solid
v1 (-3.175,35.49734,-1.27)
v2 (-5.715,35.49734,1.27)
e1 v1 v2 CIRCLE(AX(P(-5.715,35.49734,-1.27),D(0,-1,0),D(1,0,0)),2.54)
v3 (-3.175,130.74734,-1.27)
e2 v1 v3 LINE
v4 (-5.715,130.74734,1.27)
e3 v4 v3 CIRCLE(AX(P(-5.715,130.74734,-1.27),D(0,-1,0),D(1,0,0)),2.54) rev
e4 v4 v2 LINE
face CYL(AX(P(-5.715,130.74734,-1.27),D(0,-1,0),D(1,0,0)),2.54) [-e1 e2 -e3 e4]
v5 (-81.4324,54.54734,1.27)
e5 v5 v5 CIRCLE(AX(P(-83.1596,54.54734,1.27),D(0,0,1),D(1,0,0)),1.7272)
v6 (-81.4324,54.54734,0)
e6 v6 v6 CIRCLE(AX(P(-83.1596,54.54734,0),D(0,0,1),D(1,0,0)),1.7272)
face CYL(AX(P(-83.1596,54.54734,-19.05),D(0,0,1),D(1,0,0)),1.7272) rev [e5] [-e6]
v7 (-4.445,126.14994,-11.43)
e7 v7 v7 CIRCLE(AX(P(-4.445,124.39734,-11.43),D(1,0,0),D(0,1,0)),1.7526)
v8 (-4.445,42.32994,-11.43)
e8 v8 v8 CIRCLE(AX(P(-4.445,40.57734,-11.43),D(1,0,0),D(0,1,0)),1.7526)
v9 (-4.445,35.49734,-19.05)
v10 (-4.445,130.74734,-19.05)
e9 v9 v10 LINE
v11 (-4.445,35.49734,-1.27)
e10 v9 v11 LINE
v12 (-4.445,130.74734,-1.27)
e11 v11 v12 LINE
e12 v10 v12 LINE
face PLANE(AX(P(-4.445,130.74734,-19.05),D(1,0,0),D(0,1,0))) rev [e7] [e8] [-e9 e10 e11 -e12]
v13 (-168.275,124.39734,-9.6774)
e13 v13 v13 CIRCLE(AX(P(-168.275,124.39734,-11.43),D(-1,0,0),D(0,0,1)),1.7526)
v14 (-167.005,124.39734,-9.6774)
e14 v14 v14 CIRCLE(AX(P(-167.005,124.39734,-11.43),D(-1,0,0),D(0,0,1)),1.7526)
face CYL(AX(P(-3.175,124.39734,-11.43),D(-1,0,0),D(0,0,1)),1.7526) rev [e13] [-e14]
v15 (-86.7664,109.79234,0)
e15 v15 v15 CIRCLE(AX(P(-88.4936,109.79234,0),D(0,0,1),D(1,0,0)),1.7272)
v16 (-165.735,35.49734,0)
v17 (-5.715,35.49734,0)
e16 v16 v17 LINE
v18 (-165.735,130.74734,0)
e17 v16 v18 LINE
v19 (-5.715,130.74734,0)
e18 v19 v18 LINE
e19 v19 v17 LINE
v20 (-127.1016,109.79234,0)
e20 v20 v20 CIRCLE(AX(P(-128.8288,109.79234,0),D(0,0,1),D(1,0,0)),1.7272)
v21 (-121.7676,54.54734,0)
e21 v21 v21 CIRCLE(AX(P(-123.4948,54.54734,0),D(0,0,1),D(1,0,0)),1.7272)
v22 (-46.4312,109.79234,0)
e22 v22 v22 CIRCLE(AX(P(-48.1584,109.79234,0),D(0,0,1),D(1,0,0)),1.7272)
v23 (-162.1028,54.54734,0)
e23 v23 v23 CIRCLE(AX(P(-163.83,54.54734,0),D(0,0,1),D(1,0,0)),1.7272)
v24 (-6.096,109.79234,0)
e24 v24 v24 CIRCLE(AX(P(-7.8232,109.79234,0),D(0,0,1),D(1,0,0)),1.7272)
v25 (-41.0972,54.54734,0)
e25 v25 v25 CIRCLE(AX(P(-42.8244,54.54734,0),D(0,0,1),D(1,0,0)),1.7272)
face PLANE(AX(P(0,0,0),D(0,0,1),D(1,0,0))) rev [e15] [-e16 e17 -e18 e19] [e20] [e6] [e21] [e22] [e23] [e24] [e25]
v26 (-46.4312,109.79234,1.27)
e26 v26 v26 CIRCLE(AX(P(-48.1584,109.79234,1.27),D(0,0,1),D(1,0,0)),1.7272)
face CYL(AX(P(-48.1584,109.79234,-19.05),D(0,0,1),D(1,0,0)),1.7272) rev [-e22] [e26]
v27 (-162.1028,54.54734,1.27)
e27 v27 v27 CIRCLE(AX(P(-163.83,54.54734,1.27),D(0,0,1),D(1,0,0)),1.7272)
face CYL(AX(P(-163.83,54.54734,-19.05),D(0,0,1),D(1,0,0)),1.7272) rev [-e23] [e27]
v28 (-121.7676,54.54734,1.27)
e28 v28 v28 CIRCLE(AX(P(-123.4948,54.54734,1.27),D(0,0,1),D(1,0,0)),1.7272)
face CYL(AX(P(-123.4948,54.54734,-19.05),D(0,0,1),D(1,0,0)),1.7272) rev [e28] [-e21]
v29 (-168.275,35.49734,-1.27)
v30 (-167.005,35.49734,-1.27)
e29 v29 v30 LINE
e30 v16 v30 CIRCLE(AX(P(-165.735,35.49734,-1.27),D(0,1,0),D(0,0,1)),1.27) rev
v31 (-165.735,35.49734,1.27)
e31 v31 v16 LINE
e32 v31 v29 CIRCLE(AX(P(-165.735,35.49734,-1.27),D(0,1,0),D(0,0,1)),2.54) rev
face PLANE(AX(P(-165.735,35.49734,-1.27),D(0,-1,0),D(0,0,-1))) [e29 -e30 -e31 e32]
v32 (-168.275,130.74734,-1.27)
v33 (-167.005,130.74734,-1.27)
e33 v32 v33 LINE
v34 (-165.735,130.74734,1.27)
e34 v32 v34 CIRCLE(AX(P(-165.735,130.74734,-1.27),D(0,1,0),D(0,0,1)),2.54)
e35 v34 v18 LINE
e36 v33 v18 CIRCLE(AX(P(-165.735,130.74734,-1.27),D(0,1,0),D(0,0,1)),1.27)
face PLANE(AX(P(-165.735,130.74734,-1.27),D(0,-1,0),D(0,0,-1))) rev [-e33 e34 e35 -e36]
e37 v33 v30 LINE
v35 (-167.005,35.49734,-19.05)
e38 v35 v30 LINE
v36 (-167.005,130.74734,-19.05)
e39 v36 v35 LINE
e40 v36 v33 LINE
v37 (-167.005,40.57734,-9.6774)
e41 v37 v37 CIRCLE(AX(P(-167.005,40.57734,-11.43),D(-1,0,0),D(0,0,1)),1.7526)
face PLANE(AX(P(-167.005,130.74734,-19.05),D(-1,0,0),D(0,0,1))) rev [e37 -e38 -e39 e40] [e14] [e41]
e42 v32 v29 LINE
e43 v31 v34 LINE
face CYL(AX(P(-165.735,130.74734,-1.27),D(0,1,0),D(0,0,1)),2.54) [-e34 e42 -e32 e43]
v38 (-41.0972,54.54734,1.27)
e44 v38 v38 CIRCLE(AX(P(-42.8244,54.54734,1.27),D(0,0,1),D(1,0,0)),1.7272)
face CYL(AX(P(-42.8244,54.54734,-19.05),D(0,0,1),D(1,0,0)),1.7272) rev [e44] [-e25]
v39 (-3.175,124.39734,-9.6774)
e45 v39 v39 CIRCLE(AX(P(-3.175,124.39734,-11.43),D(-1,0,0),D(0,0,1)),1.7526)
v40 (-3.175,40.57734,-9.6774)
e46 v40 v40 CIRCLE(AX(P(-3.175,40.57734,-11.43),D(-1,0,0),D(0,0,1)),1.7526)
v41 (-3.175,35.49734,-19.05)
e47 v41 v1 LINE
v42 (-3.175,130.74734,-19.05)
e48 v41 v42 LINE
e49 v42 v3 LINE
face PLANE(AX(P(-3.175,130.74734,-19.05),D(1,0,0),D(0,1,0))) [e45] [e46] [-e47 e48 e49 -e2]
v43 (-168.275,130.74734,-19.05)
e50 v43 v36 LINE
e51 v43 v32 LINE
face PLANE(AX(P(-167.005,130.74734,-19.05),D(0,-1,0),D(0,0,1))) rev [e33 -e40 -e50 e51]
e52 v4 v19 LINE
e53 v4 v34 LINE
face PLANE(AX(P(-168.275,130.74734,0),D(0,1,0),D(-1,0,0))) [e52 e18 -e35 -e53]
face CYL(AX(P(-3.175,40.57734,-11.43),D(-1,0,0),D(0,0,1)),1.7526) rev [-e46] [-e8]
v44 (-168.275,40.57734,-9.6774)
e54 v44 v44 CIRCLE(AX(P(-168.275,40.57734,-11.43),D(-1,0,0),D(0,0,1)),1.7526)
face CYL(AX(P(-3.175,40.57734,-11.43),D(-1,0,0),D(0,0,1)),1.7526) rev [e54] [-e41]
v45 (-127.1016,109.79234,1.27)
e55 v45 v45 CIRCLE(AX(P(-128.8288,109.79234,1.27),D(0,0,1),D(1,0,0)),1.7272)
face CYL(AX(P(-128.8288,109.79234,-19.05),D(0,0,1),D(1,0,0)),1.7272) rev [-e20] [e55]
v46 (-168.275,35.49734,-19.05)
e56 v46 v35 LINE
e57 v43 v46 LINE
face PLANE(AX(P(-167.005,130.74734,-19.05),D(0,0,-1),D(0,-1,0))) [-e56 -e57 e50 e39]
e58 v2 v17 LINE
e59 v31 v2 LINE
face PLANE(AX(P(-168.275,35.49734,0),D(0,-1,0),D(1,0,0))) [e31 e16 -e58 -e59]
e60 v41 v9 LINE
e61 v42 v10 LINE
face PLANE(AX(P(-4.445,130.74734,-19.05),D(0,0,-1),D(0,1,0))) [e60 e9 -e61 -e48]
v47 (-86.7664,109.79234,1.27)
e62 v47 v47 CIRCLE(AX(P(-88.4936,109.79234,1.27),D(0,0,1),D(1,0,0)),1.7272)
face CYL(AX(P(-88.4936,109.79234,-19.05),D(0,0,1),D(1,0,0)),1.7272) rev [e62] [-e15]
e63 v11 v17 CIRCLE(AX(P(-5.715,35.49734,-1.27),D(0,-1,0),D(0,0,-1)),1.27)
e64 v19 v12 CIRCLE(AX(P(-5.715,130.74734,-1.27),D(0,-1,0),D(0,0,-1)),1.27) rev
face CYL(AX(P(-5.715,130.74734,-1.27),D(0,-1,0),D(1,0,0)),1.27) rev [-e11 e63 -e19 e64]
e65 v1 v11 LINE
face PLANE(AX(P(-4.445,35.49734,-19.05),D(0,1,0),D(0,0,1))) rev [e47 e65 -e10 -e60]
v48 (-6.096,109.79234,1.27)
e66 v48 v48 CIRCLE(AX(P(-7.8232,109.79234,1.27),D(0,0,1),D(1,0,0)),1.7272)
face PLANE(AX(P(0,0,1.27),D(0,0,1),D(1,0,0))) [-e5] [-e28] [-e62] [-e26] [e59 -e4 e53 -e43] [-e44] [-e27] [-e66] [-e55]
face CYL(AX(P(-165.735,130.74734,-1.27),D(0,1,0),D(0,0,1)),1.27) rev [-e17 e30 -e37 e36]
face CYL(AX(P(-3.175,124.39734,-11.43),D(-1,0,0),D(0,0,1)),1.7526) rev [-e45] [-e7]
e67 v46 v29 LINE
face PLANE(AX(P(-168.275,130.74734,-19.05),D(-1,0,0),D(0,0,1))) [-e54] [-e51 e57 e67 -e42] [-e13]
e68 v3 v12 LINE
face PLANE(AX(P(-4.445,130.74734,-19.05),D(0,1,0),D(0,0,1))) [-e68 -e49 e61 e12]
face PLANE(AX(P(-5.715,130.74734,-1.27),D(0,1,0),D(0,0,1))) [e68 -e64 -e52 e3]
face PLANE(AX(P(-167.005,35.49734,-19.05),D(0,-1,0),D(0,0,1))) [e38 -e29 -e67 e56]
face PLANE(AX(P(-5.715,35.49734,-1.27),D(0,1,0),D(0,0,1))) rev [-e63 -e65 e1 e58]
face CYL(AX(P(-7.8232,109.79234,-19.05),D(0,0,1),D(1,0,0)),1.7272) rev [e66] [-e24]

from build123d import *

# Parameters (mm, degrees)
SKETCH1_W              = 165.1
SKETCH1_H              = 95.25
BOSS_EXTRUDE1_DEPTH    = 1.27
SKETCH2_W              = 1.27
SKETCH2_H              = 95.25
BOSS_EXTRUDE2_DEPTH    = 19.05
CONVERT_SOLID1_START   = 35.497339992
CONVERT_SOLID1_DEPTH   = 95.25
CONVERT_SOLID1_2_DEPTH = 95.25
SKETCH7_R              = 1.7272
CUT_EXTRUDE1_DEPTH     = 215.065982678
SKETCH8_R              = 1.7526
CUT_EXTRUDE2_DEPTH     = 212.461058862


# Read off the part's stored shape, not the designer's step: Convert-Solid1
with BuildPart() as part:
    # Sketch1 → Boss-Extrude1 (new body)
    with BuildSketch(Plane.XY):
        with Locations((-85.725, 83.122339992)):
            Rectangle(SKETCH1_W, SKETCH1_H)
    extrude(amount=BOSS_EXTRUDE1_DEPTH)

    # Sketch2 → Boss-Extrude2 (add)
    with BuildSketch(Plane(origin=(0, 0, 0), x_dir=(-1, 0, 0), z_dir=(0, 0, -1))):
        with Locations((3.81, 83.122339992)):
            Rectangle(SKETCH2_W, SKETCH2_H)
        with Locations((167.64, 83.122339992)):
            Rectangle(SKETCH2_W, SKETCH2_H)
    extrude(amount=BOSS_EXTRUDE2_DEPTH)

    # Convert-Solid1 outline → Convert-Solid1 (cut)
    with BuildSketch(Plane(origin=(0, 0, 0), x_dir=(1, 0, 0), z_dir=(0, 1, 0)).offset(CONVERT_SOLID1_START)):
        with BuildLine():
            ThreePointArc((-3.175, 1.27), (-3.918948776, -0.526051224), (-5.715, -1.27))
            Line((-5.715, -1.27), (-3.175, -1.27))
            Line((-3.175, -1.27), (-3.175, 1.27))
        make_face()
        with BuildLine():
            ThreePointArc((-165.735, -1.27), (-167.531051224, -0.526051224), (-168.275, 1.27))
            Line((-168.275, 1.27), (-168.275, -1.27))
            Line((-168.275, -1.27), (-165.735, -1.27))
        make_face()
    extrude(amount=CONVERT_SOLID1_DEPTH, mode=Mode.SUBTRACT)

    # Convert-Solid1 2 outline → Convert-Solid1 2 (add)
    with BuildSketch(Plane(origin=(0, 0, 0), x_dir=(1, 0, 0), z_dir=(0, 1, 0)).offset(CONVERT_SOLID1_START)):
        with BuildLine():
            ThreePointArc((-4.445, 1.27), (-4.816974388, 0.371974388), (-5.715, 0))
            Line((-5.715, 0), (-4.445, 0))
            Line((-4.445, 0), (-4.445, 1.27))
        make_face()
        with BuildLine():
            ThreePointArc((-165.735, 0), (-166.633025612, 0.371974388), (-167.005, 1.27))
            Line((-167.005, 1.27), (-167.005, 0))
            Line((-167.005, 0), (-165.735, 0))
        make_face()
    extrude(amount=CONVERT_SOLID1_2_DEPTH)

    # Sketch7 → Cut-Extrude1 (cut, through all)
    with BuildSketch(Plane.XY.offset(1.27)):
        with Locations((-7.8232, 109.792339992)):
            Circle(SKETCH7_R)
        with Locations((-48.1584, 109.792339992)):
            Circle(SKETCH7_R)
        with Locations((-88.4936, 109.792339992)):
            Circle(SKETCH7_R)
        with Locations((-128.8288, 109.792339992)):
            Circle(SKETCH7_R)
        with Locations((-163.83, 54.547339992)):
            Circle(SKETCH7_R)
        with Locations((-123.4948, 54.547339992)):
            Circle(SKETCH7_R)
        with Locations((-83.1596, 54.547339992)):
            Circle(SKETCH7_R)
        with Locations((-42.8244, 54.547339992)):
            Circle(SKETCH7_R)
    extrude(amount=-CUT_EXTRUDE1_DEPTH, mode=Mode.SUBTRACT)

    # Sketch8 → Cut-Extrude2 (cut, through all)
    with BuildSketch(Plane.ZY.offset(168.275)):
        with Locations((-11.43, 40.577339992)):
            Circle(SKETCH8_R)
        with Locations((-11.43, 124.397339992)):
            Circle(SKETCH8_R)
    extrude(amount=-CUT_EXTRUDE2_DEPTH, mode=Mode.SUBTRACT)


solid = part.part
